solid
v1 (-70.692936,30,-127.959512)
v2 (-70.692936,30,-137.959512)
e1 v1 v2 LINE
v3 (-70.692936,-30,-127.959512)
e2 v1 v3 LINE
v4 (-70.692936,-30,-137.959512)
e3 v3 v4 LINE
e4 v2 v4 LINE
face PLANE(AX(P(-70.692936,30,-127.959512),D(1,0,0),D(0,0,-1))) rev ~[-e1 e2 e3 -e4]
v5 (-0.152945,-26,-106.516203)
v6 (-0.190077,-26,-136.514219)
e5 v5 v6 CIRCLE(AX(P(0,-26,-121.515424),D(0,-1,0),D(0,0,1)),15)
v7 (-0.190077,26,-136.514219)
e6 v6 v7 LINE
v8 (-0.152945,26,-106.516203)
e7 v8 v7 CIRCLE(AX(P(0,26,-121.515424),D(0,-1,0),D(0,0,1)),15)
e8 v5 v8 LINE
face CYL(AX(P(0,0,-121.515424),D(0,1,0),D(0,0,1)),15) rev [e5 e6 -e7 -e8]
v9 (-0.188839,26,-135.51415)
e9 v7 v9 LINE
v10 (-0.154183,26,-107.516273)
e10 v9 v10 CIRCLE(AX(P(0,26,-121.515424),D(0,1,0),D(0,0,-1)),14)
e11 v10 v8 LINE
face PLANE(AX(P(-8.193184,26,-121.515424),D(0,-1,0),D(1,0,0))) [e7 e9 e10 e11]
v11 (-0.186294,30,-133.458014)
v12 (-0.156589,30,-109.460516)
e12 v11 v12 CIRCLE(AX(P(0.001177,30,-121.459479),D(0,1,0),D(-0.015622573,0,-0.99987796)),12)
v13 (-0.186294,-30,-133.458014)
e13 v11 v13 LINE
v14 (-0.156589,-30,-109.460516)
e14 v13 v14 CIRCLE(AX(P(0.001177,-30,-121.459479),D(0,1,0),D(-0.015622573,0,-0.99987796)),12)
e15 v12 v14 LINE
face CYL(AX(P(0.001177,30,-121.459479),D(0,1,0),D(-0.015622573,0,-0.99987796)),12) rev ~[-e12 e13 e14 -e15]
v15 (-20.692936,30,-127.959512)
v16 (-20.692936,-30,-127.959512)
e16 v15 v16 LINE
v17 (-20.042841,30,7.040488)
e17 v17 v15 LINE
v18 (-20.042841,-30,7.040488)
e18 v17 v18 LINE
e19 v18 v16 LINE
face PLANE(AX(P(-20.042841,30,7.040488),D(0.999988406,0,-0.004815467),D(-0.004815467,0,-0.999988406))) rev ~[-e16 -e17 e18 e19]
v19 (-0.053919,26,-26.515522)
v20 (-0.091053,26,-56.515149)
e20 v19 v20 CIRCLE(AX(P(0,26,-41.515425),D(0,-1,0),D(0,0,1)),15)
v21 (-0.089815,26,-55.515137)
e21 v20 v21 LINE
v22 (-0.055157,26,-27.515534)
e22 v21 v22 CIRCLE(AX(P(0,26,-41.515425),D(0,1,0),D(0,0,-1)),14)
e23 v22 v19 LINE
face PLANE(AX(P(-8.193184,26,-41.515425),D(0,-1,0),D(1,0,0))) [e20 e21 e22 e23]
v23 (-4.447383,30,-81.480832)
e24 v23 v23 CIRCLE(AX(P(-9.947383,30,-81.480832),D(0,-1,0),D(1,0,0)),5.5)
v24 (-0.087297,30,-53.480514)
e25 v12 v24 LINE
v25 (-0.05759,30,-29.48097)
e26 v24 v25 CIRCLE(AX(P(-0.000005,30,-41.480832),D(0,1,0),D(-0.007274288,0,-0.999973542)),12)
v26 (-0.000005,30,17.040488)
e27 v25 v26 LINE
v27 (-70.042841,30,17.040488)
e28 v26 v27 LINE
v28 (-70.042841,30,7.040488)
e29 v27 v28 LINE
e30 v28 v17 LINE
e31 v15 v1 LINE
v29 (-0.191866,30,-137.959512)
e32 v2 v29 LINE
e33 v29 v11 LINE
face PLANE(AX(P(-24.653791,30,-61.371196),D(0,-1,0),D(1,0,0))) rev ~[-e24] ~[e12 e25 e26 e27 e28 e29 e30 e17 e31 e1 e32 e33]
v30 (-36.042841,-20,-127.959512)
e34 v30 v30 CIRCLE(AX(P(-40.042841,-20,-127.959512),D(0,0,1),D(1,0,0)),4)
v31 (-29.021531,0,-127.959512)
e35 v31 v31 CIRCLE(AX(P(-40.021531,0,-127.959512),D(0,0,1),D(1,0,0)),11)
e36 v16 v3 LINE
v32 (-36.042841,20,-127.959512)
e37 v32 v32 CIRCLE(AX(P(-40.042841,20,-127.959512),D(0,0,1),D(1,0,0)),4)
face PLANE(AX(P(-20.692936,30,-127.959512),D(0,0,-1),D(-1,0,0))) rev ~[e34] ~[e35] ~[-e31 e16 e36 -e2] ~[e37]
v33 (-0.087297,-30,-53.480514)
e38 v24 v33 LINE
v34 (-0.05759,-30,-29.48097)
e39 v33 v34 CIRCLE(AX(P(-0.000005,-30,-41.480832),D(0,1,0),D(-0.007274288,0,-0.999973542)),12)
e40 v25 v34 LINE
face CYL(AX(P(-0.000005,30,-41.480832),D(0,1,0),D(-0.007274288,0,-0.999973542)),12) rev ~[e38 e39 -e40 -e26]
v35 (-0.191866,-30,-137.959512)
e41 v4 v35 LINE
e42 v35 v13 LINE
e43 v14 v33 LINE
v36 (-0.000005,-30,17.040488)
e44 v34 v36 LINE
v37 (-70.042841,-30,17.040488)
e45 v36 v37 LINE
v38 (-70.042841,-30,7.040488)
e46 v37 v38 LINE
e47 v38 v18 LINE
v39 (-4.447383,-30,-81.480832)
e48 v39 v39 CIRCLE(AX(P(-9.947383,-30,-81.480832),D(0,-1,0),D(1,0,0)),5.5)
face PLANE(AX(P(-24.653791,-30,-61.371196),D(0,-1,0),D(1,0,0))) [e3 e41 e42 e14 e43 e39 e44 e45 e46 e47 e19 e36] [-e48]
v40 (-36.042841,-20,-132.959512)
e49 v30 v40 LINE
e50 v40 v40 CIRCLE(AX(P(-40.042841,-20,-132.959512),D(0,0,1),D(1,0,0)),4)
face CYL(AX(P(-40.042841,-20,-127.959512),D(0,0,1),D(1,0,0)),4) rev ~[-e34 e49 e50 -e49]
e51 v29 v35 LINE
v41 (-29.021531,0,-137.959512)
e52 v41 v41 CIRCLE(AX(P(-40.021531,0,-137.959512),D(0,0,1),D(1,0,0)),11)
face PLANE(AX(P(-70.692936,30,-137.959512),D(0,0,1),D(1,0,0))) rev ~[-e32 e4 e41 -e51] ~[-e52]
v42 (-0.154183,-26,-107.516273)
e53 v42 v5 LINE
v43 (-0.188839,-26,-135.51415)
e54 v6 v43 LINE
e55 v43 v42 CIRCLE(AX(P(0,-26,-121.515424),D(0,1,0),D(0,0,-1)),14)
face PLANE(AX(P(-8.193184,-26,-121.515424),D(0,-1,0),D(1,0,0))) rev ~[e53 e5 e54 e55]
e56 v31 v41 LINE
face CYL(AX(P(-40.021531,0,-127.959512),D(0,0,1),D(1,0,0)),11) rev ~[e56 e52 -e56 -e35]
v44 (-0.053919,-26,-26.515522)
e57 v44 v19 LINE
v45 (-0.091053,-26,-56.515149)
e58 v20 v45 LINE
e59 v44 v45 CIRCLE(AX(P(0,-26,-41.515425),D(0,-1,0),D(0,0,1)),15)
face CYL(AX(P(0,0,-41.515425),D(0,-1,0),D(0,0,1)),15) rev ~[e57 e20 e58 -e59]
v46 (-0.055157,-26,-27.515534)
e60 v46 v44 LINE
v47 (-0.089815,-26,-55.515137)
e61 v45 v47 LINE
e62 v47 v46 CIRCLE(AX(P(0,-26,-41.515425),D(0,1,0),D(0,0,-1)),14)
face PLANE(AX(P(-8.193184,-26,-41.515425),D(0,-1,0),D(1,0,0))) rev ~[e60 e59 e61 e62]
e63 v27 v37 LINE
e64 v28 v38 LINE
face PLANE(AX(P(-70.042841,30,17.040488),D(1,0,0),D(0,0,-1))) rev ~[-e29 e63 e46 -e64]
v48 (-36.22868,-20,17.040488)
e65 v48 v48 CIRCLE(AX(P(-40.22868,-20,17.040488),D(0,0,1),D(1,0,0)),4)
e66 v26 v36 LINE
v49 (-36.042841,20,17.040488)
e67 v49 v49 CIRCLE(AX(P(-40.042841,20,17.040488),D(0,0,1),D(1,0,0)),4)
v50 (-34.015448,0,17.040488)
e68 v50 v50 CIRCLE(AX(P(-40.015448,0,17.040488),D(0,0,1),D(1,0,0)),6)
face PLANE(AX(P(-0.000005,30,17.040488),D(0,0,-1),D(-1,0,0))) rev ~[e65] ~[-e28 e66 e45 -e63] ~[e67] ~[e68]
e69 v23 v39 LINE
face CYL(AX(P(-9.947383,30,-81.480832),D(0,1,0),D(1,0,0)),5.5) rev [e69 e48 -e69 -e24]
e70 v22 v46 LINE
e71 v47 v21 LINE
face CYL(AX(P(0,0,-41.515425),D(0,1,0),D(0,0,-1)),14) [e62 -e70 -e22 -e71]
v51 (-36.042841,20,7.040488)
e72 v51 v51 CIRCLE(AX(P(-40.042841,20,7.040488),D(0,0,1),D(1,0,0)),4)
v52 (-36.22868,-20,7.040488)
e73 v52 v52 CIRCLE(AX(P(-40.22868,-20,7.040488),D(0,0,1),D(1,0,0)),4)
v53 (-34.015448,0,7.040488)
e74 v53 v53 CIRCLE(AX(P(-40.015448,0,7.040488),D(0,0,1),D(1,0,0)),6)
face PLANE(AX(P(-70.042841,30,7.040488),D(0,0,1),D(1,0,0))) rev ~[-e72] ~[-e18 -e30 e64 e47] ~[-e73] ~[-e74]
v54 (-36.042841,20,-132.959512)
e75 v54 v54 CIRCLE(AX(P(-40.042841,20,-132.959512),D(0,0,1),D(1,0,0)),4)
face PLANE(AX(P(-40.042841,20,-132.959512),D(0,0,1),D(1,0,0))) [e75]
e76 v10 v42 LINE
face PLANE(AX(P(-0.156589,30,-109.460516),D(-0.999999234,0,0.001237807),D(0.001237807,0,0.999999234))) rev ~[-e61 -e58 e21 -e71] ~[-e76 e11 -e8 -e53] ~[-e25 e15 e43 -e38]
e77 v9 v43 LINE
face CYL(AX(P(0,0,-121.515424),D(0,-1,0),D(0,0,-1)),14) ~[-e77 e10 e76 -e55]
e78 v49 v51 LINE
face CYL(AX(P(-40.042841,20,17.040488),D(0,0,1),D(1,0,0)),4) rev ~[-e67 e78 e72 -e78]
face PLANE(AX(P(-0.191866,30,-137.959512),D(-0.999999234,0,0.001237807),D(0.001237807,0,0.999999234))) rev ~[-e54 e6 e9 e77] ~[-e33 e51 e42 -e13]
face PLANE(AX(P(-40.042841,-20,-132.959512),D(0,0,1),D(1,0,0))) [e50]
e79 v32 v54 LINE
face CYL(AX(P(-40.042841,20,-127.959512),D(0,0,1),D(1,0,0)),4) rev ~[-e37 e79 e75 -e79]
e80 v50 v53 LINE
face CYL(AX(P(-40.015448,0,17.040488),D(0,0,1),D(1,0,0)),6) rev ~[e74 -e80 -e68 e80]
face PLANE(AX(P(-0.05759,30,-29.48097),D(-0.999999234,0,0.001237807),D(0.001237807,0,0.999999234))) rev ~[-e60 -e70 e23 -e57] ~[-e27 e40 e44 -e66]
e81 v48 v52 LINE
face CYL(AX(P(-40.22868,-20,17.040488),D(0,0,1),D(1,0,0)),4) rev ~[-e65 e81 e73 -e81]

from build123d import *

# Parameters (mm, degrees)
F0_R          = 5.5
F1_DEPTH      = 60
F4_DEPTH      = 26
F4_DEPTH_BACK = 26
F5_R          = 4
F6_DEPTH      = 5
F7_R          = 4
F8_DEPTH      = 15
F9_R          = 11
F10_DEPTH     = 10.001
F11_R         = 6
F12_DEPTH     = 25


# Not quite as in the source:
# - a feature names something its author has since deleted; it is built from what else it names


with BuildPart() as f1:
    # F0 (on Front) → F1 (new body)
    with BuildSketch(Plane.XZ):
        with BuildLine():
            ThreePointArc((-0.0872969156, -53.4805140133), (-11.9999962709, -41.4659778258), (-0.0575900904, -29.4809696761))
            Line((-0.0575900904, -29.4809696761), (-5.4639e-06, 17.0404876904))
            Line((-5.4639e-06, 17.0404876904), (-70.0428405992, 17.0404876904))
            Line((-70.0428405992, 17.0404876904), (-70.0428405992, 7.0404876904))
            Line((-70.0428405992, 7.0404876904), (-20.0428405992, 7.0404876904))
            Line((-20.0428405992, 7.0404876904), (-20.6929361639, -127.9595123096))
            Line((-20.6929361639, -127.9595123096), (-70.6929361639, -127.9595123096))
            Line((-70.6929361639, -127.9595123096), (-70.6929361639, -137.9595123096))
            Line((-70.6929361639, -137.9595123096), (-0.1918656855, -137.9595123096))
            Line((-0.1918656855, -137.9595123096), (-0.1862936956, -133.4580141387))
            ThreePointArc((-0.1862936956, -133.4580141387), (-11.9988136294, -121.4446249335), (-0.1565894029, -109.4605157571))
            Line((-0.1565894029, -109.4605157571), (-0.0872969156, -53.4805140133))
        make_face()
        with Locations((-9.947382845, -81.480831509)):
            Circle(F0_R, mode=Mode.SUBTRACT)
    extrude(amount=F1_DEPTH)


with BuildPart() as f1_1:
    # F2: moved
    add(f1.part.moved(Location((0, 30, 0))))

    # F3 (on Front) → F4 (cut, two sides)
    with BuildSketch(Plane.XZ) as f4_sk:
        with BuildLine():
            ThreePointArc((0, -55.5154254436), (-14, -41.5154254436), (0, -27.5154254436))
            Line((0, -27.5154254436), (0, -26.5154254436))
            ThreePointArc((0, -26.5154254436), (-15, -41.5154254436), (0, -56.5154254436))
            Line((0, -56.5154254436), (0, -55.5154254436))
        make_face()
        with BuildLine():
            Line((0, -107.5154236555), (0, -106.5154236555))
            ThreePointArc((0, -106.5154236555), (-15, -121.5154236555), (0, -136.5154236555))
            Line((0, -136.5154236555), (0, -135.5154236555))
            ThreePointArc((0, -135.5154236555), (-14, -121.5154236555), (0, -107.5154236555))
        make_face()
    extrude(amount=F4_DEPTH, mode=Mode.SUBTRACT)
    extrude(f4_sk.sketch, amount=-F4_DEPTH_BACK, mode=Mode.SUBTRACT)

    # F5 (on face) → F6 (cut)
    with BuildSketch(Plane.XY.offset(-127.9595123096)):
        with Locations((-40.0428405992, -20)):
            Circle(F5_R)
        with Locations((-40.0428405992, 20)):
            Circle(F5_R)
    extrude(amount=-F6_DEPTH, mode=Mode.SUBTRACT)

    # F7 (on face) → F8 (cut)
    with BuildSketch(Plane.XY.offset(17.0404876904)):
        with Locations((-40.0428405992, 20)):
            Circle(F7_R)
        with Locations((-40.2286797762, -20)):
            Circle(F7_R)
    extrude(amount=-F8_DEPTH, mode=Mode.SUBTRACT)

    # F9 (on face) → F10 (cut, through all)
    with BuildSketch(Plane.XY.offset(-127.9595123096)):
        with Locations((-40.0215312839, 0)):
            Circle(F9_R)
    extrude(amount=-F10_DEPTH, mode=Mode.SUBTRACT)

    # F11 (on face) → F12 (cut)
    with BuildSketch(Plane.XY.offset(17.0404876904)):
        with Locations((-40.0154478848, 0)):
            Circle(F11_R)
    extrude(amount=-F12_DEPTH, mode=Mode.SUBTRACT)


solid = f1_1.part
